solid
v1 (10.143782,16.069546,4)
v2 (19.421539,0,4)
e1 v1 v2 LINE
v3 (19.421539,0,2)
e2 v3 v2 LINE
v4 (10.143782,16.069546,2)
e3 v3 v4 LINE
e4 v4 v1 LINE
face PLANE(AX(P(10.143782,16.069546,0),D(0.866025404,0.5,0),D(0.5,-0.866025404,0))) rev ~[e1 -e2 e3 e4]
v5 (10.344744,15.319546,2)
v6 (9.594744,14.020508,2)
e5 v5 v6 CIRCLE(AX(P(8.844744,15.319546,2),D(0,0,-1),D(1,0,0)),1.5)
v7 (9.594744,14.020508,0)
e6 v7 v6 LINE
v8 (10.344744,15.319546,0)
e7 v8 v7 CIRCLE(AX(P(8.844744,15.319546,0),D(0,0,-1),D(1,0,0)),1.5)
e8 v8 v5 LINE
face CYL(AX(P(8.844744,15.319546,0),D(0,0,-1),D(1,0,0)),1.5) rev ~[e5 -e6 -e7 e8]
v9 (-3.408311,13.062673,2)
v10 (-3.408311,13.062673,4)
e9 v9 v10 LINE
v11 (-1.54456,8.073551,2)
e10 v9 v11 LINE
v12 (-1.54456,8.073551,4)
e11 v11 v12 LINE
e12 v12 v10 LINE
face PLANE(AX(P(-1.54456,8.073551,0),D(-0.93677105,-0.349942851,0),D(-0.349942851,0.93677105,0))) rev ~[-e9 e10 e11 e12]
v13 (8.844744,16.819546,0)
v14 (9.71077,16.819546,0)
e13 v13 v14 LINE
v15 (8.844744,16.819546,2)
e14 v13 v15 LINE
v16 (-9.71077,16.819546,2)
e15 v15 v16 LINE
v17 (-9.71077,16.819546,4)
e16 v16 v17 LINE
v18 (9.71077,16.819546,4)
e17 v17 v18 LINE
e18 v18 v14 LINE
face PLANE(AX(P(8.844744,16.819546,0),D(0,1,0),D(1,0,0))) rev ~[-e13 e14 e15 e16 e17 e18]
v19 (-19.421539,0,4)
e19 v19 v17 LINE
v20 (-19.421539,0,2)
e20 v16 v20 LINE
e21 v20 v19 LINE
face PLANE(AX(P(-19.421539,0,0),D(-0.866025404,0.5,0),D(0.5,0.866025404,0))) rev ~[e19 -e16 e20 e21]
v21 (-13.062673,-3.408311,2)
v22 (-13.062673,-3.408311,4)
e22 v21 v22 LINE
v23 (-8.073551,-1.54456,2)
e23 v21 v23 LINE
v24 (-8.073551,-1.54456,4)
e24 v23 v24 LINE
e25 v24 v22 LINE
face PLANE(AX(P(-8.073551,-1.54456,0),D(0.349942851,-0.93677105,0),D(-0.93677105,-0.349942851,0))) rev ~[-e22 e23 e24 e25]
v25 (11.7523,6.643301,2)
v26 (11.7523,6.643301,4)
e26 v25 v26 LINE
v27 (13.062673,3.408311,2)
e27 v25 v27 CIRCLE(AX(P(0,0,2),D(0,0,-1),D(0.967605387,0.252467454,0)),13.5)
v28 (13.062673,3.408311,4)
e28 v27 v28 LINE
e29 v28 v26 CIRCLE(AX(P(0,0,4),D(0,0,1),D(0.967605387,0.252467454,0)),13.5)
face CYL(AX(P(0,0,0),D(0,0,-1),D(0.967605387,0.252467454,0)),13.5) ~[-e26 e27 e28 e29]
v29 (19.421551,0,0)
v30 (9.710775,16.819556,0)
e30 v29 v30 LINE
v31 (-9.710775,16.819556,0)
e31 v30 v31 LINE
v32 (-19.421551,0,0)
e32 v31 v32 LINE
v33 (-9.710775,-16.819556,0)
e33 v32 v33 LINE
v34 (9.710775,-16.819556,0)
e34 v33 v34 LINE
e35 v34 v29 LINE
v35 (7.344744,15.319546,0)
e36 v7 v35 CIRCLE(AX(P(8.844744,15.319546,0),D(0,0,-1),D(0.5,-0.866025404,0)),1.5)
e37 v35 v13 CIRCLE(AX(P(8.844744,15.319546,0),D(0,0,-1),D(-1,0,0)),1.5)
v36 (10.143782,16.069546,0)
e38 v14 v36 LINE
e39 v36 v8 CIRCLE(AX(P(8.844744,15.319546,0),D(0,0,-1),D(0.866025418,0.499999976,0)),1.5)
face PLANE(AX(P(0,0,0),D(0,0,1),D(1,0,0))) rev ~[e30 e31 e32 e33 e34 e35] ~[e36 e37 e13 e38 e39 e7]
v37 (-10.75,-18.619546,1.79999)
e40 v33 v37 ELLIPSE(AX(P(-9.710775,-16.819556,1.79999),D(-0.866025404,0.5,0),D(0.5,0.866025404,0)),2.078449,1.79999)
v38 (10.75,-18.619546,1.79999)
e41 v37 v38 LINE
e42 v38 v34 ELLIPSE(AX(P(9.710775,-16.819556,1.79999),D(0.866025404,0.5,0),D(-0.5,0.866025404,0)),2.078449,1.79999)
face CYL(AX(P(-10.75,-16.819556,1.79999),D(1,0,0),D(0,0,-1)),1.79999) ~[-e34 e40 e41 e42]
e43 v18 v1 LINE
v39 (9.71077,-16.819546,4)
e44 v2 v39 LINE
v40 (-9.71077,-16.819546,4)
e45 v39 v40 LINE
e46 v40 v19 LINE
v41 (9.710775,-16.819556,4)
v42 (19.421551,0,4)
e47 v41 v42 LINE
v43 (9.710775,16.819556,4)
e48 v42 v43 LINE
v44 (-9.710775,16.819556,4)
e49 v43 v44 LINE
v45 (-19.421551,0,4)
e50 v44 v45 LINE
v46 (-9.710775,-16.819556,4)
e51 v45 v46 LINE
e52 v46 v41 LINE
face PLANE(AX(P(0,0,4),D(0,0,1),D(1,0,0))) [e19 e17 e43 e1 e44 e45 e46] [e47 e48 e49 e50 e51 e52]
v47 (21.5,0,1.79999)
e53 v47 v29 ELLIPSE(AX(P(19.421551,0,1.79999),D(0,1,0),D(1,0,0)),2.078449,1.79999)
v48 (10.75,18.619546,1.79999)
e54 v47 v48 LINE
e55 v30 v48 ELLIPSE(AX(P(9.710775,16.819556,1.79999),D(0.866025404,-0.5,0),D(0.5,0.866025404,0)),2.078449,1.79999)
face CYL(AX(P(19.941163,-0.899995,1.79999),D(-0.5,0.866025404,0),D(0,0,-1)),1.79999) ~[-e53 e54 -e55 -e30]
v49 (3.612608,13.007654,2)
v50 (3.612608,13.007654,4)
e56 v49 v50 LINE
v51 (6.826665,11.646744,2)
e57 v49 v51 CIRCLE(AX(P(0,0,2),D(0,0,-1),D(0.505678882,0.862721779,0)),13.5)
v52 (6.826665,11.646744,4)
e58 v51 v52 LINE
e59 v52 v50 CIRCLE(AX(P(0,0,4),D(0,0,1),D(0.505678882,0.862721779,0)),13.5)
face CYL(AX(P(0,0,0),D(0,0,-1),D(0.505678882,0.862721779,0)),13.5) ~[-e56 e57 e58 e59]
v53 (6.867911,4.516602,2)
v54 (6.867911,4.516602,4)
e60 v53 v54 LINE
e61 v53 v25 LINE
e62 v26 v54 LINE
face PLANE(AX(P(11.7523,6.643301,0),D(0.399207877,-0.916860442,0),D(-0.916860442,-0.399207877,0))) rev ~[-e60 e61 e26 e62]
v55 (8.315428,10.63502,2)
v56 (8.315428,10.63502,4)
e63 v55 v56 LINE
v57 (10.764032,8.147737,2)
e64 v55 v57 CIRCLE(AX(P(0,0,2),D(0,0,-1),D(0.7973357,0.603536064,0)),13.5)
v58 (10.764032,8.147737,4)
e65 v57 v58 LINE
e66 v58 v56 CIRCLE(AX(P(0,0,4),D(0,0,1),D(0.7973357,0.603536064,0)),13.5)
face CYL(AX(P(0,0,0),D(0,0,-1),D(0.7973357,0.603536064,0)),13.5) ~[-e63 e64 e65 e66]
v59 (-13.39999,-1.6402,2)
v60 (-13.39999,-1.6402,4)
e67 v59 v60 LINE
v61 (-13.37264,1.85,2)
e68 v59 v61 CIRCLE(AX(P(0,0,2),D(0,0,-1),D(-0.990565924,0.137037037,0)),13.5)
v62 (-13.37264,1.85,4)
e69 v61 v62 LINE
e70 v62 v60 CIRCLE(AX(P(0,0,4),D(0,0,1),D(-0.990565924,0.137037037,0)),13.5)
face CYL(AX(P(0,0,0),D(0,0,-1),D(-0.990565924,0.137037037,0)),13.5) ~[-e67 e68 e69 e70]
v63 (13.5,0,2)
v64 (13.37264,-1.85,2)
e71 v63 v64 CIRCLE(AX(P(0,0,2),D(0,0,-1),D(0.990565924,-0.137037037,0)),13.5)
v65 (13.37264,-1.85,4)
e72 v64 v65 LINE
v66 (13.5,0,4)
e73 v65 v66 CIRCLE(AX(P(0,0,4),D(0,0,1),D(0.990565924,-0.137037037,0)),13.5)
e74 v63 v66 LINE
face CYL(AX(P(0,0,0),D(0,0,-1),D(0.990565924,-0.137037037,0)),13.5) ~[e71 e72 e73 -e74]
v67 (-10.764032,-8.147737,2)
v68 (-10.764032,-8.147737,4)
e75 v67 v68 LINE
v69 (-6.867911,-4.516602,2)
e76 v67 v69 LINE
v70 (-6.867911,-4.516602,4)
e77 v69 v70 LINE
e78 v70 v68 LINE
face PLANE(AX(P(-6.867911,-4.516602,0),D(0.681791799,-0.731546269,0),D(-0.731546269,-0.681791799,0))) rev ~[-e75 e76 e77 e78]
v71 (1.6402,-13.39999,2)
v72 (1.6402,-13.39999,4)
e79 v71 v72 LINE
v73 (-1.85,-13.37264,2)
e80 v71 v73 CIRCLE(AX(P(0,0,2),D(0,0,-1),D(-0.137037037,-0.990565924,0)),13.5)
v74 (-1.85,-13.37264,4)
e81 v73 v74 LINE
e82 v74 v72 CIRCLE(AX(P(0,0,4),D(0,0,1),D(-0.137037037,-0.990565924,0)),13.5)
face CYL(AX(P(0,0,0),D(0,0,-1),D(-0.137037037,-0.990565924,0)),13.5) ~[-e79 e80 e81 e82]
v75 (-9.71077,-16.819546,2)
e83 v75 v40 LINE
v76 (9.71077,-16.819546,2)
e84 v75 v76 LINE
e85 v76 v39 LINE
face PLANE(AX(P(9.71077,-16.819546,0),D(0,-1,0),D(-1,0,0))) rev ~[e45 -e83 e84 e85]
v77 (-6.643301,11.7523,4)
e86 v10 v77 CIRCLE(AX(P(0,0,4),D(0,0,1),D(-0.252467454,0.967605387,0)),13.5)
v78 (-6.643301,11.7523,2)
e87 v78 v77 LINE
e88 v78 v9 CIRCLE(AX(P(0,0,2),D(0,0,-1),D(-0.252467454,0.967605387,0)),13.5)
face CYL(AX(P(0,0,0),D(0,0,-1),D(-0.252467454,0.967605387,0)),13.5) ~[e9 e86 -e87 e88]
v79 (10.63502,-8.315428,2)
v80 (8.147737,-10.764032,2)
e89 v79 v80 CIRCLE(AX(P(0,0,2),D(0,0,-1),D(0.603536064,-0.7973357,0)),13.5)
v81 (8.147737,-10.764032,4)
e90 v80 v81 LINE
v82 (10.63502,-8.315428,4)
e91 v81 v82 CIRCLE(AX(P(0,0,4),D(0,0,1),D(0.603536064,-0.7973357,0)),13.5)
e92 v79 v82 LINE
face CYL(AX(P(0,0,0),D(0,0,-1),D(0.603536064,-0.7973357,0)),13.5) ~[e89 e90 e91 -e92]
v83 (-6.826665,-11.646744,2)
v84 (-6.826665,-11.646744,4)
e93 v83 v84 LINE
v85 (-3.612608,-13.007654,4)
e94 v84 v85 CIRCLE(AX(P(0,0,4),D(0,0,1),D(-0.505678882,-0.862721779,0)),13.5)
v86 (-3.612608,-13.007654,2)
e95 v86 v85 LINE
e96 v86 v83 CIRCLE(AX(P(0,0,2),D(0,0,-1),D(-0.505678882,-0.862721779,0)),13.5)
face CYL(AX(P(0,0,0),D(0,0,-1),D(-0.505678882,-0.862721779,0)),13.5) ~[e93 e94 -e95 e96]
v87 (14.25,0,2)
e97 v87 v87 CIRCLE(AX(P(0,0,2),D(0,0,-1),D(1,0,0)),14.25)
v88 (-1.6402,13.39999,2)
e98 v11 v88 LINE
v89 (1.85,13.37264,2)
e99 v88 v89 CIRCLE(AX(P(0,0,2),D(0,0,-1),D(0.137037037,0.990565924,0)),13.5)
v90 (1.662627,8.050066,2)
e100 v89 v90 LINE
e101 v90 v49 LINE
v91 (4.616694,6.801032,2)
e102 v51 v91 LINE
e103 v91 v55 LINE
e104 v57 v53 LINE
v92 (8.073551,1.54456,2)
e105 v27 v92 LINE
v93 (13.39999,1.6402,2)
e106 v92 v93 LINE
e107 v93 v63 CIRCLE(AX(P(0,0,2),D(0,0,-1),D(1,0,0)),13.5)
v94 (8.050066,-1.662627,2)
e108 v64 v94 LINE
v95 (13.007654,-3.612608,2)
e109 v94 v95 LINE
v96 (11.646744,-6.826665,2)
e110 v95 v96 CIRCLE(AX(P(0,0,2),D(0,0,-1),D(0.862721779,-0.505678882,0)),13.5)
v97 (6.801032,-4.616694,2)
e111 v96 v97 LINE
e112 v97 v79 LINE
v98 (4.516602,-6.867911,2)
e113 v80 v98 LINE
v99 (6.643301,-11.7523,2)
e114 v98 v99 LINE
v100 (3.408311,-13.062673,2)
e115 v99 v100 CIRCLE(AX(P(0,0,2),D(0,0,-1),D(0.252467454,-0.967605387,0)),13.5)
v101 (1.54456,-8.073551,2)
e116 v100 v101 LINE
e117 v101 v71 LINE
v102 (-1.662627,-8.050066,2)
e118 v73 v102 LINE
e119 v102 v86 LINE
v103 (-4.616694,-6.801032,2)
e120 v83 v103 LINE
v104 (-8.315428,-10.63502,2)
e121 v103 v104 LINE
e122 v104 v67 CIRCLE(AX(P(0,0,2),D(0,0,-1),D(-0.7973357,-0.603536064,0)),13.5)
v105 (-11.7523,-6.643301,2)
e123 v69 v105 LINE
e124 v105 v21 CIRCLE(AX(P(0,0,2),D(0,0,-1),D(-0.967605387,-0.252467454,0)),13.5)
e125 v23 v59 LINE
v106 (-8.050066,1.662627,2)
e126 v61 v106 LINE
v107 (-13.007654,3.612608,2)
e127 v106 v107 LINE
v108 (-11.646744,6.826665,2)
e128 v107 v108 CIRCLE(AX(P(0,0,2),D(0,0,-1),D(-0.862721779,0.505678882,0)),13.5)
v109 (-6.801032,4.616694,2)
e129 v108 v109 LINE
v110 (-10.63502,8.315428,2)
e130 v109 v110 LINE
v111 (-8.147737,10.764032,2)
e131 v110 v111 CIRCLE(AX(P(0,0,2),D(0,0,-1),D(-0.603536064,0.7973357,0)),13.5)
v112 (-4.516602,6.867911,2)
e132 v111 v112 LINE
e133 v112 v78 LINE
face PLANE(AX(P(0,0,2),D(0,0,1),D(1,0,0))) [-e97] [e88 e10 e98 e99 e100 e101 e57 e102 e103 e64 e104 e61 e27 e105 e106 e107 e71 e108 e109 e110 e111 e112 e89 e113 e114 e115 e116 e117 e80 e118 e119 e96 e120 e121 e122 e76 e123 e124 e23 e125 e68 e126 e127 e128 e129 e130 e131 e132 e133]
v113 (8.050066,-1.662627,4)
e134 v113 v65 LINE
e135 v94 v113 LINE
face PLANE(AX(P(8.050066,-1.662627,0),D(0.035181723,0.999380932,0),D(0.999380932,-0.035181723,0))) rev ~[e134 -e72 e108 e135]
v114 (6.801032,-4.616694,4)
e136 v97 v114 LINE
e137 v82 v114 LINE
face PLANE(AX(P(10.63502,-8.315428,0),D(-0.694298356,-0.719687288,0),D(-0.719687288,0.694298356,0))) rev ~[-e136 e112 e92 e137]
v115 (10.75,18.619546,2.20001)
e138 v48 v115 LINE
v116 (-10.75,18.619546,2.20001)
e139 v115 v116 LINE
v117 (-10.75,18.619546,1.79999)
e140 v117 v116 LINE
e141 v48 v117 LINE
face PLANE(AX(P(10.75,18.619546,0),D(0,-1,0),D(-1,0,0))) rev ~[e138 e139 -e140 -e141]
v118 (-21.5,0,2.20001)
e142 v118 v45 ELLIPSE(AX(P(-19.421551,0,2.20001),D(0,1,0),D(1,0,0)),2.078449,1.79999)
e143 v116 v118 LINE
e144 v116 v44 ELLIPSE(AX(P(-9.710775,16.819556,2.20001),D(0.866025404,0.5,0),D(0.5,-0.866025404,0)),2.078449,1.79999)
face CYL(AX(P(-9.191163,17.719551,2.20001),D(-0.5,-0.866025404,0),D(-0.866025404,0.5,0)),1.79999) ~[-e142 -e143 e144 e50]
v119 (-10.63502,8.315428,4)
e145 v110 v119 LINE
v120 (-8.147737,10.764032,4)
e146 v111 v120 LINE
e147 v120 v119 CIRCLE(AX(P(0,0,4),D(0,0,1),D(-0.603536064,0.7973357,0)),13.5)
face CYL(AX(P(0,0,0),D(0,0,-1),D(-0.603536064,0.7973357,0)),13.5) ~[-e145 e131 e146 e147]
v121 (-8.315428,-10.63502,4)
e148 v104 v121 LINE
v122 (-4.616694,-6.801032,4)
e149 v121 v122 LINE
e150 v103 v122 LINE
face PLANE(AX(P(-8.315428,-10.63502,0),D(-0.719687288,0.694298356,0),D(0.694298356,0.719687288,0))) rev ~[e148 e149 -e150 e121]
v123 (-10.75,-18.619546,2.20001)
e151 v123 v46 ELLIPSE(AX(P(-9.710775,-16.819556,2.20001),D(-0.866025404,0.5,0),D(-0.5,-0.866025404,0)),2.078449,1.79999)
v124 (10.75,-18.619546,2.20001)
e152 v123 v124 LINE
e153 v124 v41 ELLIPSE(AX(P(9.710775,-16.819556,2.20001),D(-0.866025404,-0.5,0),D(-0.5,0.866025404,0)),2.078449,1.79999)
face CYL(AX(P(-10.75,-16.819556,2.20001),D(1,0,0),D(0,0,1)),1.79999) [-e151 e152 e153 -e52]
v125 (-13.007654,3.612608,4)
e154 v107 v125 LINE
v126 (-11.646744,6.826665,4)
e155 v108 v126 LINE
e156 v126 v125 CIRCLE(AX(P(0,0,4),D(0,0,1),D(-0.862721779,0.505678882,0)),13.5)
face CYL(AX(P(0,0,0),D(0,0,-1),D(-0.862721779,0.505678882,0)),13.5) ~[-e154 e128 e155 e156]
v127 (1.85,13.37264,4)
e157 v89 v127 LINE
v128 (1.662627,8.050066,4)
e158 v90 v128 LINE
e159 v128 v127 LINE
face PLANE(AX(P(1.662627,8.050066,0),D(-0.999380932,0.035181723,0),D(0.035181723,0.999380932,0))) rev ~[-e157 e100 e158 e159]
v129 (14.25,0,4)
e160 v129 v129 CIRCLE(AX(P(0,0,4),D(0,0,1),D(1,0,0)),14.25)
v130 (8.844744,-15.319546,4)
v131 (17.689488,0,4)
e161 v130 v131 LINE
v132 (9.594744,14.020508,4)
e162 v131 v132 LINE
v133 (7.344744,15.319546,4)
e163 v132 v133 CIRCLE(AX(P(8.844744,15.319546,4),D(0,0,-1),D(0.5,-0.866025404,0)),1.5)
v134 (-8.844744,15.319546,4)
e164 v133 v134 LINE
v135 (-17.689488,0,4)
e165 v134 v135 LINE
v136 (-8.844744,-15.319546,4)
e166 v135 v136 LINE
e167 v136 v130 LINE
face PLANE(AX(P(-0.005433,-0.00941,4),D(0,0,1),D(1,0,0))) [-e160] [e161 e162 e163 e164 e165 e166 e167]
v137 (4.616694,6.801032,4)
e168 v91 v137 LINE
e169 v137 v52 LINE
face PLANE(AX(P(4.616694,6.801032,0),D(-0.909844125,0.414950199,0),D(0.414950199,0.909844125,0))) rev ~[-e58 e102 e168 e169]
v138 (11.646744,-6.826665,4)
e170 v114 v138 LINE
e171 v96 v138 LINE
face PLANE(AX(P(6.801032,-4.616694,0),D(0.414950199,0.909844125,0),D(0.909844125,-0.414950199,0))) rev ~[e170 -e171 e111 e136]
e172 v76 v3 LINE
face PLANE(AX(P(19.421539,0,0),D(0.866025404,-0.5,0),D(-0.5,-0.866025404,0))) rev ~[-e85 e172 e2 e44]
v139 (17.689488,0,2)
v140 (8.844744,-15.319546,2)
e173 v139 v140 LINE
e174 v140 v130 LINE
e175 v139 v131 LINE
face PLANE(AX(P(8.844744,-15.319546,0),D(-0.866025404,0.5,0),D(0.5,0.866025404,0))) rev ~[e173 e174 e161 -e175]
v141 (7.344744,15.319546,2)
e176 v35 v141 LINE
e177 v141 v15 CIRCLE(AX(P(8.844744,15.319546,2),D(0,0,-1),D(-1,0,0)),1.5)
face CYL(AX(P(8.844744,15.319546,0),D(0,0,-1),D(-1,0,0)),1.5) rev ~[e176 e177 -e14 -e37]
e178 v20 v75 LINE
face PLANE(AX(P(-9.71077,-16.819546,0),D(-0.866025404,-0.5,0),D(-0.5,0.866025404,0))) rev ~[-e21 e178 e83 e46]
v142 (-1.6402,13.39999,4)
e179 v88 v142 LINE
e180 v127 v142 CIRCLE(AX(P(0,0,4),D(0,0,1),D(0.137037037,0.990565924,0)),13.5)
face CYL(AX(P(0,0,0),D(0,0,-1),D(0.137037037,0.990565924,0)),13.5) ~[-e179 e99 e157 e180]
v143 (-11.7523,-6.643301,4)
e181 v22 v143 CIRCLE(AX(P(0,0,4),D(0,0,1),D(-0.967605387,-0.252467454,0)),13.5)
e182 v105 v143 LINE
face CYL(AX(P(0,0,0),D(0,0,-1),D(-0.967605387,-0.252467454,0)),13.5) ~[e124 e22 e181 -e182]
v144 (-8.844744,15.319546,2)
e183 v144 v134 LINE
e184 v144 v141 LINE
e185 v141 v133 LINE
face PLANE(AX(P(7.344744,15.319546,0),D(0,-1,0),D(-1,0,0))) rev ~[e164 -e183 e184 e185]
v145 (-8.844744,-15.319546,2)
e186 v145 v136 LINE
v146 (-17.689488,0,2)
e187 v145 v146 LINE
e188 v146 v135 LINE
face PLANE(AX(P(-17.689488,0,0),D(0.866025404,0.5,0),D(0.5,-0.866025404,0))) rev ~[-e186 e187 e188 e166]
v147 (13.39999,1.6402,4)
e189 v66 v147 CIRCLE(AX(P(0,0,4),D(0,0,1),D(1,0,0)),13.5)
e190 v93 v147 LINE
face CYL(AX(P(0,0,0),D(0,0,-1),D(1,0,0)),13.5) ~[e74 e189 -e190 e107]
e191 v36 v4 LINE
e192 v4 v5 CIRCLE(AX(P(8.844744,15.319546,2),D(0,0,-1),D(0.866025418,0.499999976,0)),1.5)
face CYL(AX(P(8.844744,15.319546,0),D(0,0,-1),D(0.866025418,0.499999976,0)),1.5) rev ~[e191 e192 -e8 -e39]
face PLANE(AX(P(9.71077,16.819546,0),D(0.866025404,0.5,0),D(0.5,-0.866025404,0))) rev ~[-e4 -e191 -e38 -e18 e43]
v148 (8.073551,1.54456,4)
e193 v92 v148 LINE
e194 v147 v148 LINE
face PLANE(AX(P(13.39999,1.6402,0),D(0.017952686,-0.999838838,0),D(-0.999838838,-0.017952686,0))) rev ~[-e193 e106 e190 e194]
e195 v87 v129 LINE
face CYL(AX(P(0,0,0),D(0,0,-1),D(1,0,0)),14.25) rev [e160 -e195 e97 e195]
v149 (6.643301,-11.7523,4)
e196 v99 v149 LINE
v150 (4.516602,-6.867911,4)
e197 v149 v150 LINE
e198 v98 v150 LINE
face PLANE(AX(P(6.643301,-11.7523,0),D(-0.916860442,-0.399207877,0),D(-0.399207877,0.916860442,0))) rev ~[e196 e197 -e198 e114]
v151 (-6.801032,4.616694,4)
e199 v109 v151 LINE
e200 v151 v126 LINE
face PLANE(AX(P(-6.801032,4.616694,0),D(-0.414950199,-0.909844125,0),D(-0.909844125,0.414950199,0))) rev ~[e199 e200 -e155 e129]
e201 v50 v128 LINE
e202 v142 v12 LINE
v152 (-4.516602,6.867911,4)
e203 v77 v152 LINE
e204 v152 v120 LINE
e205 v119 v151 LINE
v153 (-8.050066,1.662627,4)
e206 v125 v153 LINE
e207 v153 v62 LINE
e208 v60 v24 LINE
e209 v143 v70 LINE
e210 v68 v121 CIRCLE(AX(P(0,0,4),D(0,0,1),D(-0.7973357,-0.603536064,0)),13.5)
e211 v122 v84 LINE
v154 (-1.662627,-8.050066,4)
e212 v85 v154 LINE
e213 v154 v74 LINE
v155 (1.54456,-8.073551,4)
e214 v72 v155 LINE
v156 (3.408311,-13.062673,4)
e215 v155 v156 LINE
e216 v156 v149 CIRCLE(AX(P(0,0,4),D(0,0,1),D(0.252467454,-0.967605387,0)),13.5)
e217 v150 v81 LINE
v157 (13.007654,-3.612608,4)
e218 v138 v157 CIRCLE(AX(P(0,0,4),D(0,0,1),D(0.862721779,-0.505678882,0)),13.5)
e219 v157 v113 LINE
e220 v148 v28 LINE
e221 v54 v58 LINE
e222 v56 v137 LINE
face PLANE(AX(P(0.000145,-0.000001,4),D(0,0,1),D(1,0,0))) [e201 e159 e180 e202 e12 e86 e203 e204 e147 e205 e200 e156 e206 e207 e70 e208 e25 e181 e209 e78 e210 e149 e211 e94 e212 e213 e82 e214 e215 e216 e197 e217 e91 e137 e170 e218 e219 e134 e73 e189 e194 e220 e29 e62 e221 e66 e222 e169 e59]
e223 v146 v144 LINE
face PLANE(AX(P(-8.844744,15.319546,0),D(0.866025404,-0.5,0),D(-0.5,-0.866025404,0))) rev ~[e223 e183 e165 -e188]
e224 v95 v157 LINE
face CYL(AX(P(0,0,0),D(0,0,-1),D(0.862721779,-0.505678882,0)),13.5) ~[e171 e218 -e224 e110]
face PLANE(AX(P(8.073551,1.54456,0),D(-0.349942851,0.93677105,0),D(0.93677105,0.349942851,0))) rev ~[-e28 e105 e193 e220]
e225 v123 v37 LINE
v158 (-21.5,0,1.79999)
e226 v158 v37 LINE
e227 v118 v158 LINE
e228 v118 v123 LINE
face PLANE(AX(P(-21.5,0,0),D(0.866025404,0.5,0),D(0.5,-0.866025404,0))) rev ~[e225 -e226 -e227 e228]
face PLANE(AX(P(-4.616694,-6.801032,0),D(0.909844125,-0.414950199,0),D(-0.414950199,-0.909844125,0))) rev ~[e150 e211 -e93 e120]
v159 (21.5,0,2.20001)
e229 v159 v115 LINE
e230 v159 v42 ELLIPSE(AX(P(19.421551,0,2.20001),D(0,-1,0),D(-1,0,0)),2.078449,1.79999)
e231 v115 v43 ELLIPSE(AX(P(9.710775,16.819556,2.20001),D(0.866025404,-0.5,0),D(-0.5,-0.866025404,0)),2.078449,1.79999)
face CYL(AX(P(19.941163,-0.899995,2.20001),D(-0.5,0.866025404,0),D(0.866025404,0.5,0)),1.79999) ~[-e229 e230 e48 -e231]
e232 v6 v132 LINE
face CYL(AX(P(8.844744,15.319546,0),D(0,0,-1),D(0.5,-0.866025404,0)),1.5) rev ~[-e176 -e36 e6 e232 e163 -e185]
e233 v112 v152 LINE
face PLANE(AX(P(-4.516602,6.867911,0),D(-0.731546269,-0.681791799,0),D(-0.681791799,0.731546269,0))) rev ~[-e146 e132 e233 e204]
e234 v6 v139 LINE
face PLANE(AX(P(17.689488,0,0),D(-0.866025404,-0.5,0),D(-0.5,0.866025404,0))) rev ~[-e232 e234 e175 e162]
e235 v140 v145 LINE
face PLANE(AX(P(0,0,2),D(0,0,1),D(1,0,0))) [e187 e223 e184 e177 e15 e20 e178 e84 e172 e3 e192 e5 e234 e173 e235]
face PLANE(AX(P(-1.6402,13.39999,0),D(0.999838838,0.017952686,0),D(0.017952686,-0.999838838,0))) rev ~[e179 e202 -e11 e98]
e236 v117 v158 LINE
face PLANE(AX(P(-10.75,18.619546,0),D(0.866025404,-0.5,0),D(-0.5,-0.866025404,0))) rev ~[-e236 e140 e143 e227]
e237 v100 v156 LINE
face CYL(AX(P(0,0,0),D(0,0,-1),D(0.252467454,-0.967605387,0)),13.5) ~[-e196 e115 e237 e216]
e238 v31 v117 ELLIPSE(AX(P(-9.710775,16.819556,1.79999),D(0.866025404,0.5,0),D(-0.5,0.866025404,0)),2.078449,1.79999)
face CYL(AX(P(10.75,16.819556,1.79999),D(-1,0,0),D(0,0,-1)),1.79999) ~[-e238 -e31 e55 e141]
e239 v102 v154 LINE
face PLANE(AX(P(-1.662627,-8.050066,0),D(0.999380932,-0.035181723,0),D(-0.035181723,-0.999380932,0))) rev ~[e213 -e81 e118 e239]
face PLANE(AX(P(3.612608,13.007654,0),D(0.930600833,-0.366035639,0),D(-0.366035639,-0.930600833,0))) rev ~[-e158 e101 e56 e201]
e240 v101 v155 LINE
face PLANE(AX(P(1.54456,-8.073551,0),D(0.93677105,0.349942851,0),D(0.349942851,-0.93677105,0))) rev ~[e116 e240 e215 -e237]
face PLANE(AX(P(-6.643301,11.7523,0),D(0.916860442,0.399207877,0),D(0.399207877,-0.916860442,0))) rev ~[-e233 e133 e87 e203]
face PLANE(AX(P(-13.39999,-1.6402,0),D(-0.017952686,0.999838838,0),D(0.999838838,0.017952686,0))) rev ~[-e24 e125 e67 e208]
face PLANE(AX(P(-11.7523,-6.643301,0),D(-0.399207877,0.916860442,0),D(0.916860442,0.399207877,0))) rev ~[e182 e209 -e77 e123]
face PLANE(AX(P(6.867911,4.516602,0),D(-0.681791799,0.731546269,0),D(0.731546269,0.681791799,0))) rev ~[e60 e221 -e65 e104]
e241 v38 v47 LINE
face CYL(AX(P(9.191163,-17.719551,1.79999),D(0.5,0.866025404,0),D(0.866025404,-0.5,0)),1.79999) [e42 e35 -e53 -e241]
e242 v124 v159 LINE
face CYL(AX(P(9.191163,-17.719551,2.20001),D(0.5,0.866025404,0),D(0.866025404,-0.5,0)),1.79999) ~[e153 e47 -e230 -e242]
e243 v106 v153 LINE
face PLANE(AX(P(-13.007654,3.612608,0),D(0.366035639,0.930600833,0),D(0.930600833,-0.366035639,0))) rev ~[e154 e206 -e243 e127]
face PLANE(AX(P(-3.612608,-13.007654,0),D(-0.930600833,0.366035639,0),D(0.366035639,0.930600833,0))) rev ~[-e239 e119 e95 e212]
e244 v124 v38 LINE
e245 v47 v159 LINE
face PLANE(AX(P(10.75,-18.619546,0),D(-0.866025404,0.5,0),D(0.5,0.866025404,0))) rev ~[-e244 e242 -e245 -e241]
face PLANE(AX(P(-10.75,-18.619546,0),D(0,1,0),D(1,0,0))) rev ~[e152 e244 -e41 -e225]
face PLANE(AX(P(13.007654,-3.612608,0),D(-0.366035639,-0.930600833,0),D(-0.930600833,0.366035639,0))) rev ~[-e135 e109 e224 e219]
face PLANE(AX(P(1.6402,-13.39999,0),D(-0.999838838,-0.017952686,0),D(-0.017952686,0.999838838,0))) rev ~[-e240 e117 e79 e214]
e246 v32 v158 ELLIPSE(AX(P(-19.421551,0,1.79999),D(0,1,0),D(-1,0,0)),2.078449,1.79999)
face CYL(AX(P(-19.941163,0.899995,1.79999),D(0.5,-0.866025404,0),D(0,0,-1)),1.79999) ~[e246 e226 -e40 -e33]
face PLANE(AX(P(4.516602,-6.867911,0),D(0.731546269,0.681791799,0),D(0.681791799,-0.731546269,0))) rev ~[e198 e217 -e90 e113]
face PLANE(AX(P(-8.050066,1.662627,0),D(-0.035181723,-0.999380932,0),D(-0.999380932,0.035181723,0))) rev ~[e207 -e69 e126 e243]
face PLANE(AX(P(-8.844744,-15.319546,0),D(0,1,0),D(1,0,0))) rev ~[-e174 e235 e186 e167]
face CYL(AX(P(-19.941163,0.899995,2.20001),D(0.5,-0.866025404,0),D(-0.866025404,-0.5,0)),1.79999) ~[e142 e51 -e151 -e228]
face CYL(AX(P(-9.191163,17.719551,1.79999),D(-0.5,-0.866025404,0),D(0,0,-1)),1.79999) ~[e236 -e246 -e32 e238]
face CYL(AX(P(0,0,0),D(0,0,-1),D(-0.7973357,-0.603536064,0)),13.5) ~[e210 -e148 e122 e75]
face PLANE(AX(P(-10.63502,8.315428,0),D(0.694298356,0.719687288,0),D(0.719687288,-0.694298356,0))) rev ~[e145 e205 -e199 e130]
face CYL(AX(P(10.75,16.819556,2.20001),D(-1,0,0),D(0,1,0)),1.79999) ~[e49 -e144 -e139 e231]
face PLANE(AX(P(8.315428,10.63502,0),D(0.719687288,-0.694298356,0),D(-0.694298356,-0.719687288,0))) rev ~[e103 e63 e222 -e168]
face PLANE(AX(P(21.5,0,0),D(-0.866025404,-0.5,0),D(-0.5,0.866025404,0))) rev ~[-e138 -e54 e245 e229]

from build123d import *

# Parameters (mm, degrees)
F0_R     = 14.25
F1_DEPTH = 2
F2_DEPTH = 4
F3_R     = 1.79999


# Not quite as in the source:
# - a fillet or chamfer is up to 0.001 mm smaller than in the source, because OpenCascade refuses the exact size


with BuildPart() as f1:
    # F0 (on Top) → F1 (new body)
    with BuildSketch(Plane.XY):
        Polygon((10.75, -18.6195461814), (21.5, 0), (10.75, 18.6195461814), (-10.75, 18.6195461814), (-21.5, 0), (-10.75, -18.6195461814), align=None)
        Polygon((-19.4215390309, 0), (-9.7107695155, 16.8195461814), (8.8447441387, 16.8195461814), (9.7107695155, 16.8195461814), (10.1437822383, 16.069546145), (19.4215390309, 0), (9.7107695155, -16.8195461814), (-9.7107695155, -16.8195461814), align=None, mode=Mode.SUBTRACT)
        with BuildLine():
            ThreePointArc((9.5947441117, 14.0205080757), (8.0947441117, 14.0205080757), (7.3447441117, 15.3195461814))
            Line((7.3447441117, 15.3195461814), (-8.8447441117, 15.3195461814))
            Line((-8.8447441117, 15.3195461814), (-17.6894882233, 0))
            Line((-17.6894882233, 0), (-8.8447441117, -15.3195461814))
            Line((-8.8447441117, -15.3195461814), (8.8447441117, -15.3195461814))
            Line((8.8447441117, -15.3195461814), (17.6894882233, 0))
            Line((17.6894882233, 0), (9.5947441117, 14.0205080757))
        make_face()
        Circle(F0_R, mode=Mode.SUBTRACT)
        Circle(F0_R)
        with BuildLine():
            ThreePointArc((13.3999904986, 1.6401995725), (13.4749744291, 0.8216228664), (13.5, 0))
            ThreePointArc((13.5, 0), (13.4681223582, -0.9271893786), (13.3726399787, -1.85))
            ThreePointArc((13.3726399787, -1.85), (13.2195565752, -2.7373936427), (13.0076541597, -3.6126075434))
            ThreePointArc((13.0076541597, -3.6126075434), (12.4315074952, -5.2638029406), (11.6467440221, -6.826664902))
            ThreePointArc((11.6467440221, -6.826664902), (11.1657225538, -7.5879272435), (10.6350203896, -8.3154279091))
            ThreePointArc((10.6350203896, -8.3154279091), (9.4708451564, -9.6204517577), (8.1477368661, -10.7640319565))
            ThreePointArc((8.1477368661, -10.7640319565), (7.4120084911, -11.2832677061), (6.643301172, -11.7522997553))
            ThreePointArc((6.643301172, -11.7522997553), (5.0683324961, -12.5124740043), (3.4083106317, -13.0626727218))
            ThreePointArc((3.4083106317, -13.0626727218), (2.5298833256, -13.2608329436), (1.6401995725, -13.3999904986))
            ThreePointArc((1.6401995725, -13.3999904986), (-0.1057878423, -13.4995855097), (-1.85, -13.3726399787))
            ThreePointArc((-1.85, -13.3726399787), (-2.7373936427, -13.2195565752), (-3.6126075434, -13.0076541597))
            ThreePointArc((-3.6126075434, -13.0076541597), (-5.2638029406, -12.4315074952), (-6.826664902, -11.6467440221))
            ThreePointArc((-6.826664902, -11.6467440221), (-7.5879272435, -11.1657225538), (-8.3154279091, -10.6350203896))
            ThreePointArc((-8.3154279091, -10.6350203896), (-9.6204517577, -9.4708451564), (-10.7640319565, -8.1477368661))
            ThreePointArc((-10.7640319565, -8.1477368661), (-11.2832677061, -7.4120084911), (-11.7522997553, -6.643301172))
            ThreePointArc((-11.7522997553, -6.643301172), (-12.5124740043, -5.0683324961), (-13.0626727218, -3.4083106317))
            ThreePointArc((-13.0626727218, -3.4083106317), (-13.2608329436, -2.5298833256), (-13.3999904986, -1.6401995725))
            ThreePointArc((-13.3999904986, -1.6401995725), (-13.4995855097, 0.1057878423), (-13.3726399787, 1.85))
            ThreePointArc((-13.3726399787, 1.85), (-13.2195565752, 2.7373936427), (-13.0076541597, 3.6126075434))
            ThreePointArc((-13.0076541597, 3.6126075434), (-12.4315074952, 5.2638029406), (-11.6467440221, 6.826664902))
            ThreePointArc((-11.6467440221, 6.826664902), (-11.1657225538, 7.5879272435), (-10.6350203896, 8.3154279091))
            ThreePointArc((-10.6350203896, 8.3154279091), (-9.4708451564, 9.6204517577), (-8.1477368661, 10.7640319565))
            ThreePointArc((-8.1477368661, 10.7640319565), (-7.4120084911, 11.2832677061), (-6.643301172, 11.7522997553))
            ThreePointArc((-6.643301172, 11.7522997553), (-5.0683324961, 12.5124740043), (-3.4083106317, 13.0626727218))
            ThreePointArc((-3.4083106317, 13.0626727218), (-2.5298833256, 13.2608329436), (-1.6401995725, 13.3999904986))
            ThreePointArc((-1.6401995725, 13.3999904986), (0.1057878423, 13.4995855097), (1.85, 13.3726399787))
            ThreePointArc((1.85, 13.3726399787), (2.7373936427, 13.2195565752), (3.6126075434, 13.0076541597))
            ThreePointArc((3.6126075434, 13.0076541597), (5.2638029406, 12.4315074952), (6.826664902, 11.6467440221))
            ThreePointArc((6.826664902, 11.6467440221), (7.5879272435, 11.1657225538), (8.3154279091, 10.6350203896))
            ThreePointArc((8.3154279091, 10.6350203896), (9.6204517577, 9.4708451564), (10.7640319565, 8.1477368661))
            ThreePointArc((10.7640319565, 8.1477368661), (11.2832677061, 7.4120084911), (11.7522997553, 6.643301172))
            ThreePointArc((11.7522997553, 6.643301172), (12.5124740043, 5.0683324961), (13.0626727218, 3.4083106317))
            ThreePointArc((13.0626727218, 3.4083106317), (13.2608329436, 2.5298833256), (13.3999904986, 1.6401995725))
        make_face(mode=Mode.SUBTRACT)
        with BuildLine():
            ThreePointArc((13.3726399787, -1.85), (13.4681223582, -0.9271893786), (13.5, 0))
            ThreePointArc((13.5, 0), (13.4749744291, 0.8216228664), (13.3999904986, 1.6401995725))
            Line((13.3999904986, 1.6401995725), (8.0735512703, 1.5445602693))
            Line((8.0735512703, 1.5445602693), (13.0626727218, 3.4083106317))
            ThreePointArc((13.0626727218, 3.4083106317), (12.5124740043, 5.0683324961), (11.7522997553, 6.643301172))
            Line((11.7522997553, 6.643301172), (6.867911148, 4.5166019311))
            Line((6.867911148, 4.5166019311), (10.7640319565, 8.1477368661))
            ThreePointArc((10.7640319565, 8.1477368661), (9.6204517577, 9.4708451564), (8.3154279091, 10.6350203896))
            Line((8.3154279091, 10.6350203896), (4.6166938111, 6.8010318919))
            Line((4.6166938111, 6.8010318919), (6.826664902, 11.6467440221))
            ThreePointArc((6.826664902, 11.6467440221), (5.2638029406, 12.4315074952), (3.6126075434, 13.0076541597))
            Line((3.6126075434, 13.0076541597), (1.6626266919, 8.0500663987))
            Line((1.6626266919, 8.0500663987), (1.85, 13.3726399787))
            ThreePointArc((1.85, 13.3726399787), (0.1057878423, 13.4995855097), (-1.6401995725, 13.3999904986))
            Line((-1.6401995725, 13.3999904986), (-1.5445602693, 8.0735512703))
            Line((-1.5445602693, 8.0735512703), (-3.4083106317, 13.0626727218))
            ThreePointArc((-3.4083106317, 13.0626727218), (-5.0683324961, 12.5124740043), (-6.643301172, 11.7522997553))
            Line((-6.643301172, 11.7522997553), (-4.5166019311, 6.867911148))
            Line((-4.5166019311, 6.867911148), (-8.1477368661, 10.7640319565))
            ThreePointArc((-8.1477368661, 10.7640319565), (-9.4708451564, 9.6204517577), (-10.6350203896, 8.3154279091))
            Line((-10.6350203896, 8.3154279091), (-6.8010318919, 4.6166938111))
            Line((-6.8010318919, 4.6166938111), (-11.6467440221, 6.826664902))
            ThreePointArc((-11.6467440221, 6.826664902), (-12.4315074952, 5.2638029406), (-13.0076541597, 3.6126075434))
            Line((-13.0076541597, 3.6126075434), (-8.0500663987, 1.6626266919))
            Line((-8.0500663987, 1.6626266919), (-13.3726399787, 1.85))
            ThreePointArc((-13.3726399787, 1.85), (-13.4995855097, 0.1057878423), (-13.3999904986, -1.6401995725))
            Line((-13.3999904986, -1.6401995725), (-8.0735512703, -1.5445602693))
            Line((-8.0735512703, -1.5445602693), (-13.0626727218, -3.4083106317))
            ThreePointArc((-13.0626727218, -3.4083106317), (-12.5124740043, -5.0683324961), (-11.7522997553, -6.643301172))
            Line((-11.7522997553, -6.643301172), (-6.867911148, -4.5166019311))
            Line((-6.867911148, -4.5166019311), (-10.7640319565, -8.1477368661))
            ThreePointArc((-10.7640319565, -8.1477368661), (-9.6204517577, -9.4708451564), (-8.3154279091, -10.6350203896))
            Line((-8.3154279091, -10.6350203896), (-4.6166938111, -6.8010318919))
            Line((-4.6166938111, -6.8010318919), (-6.826664902, -11.6467440221))
            ThreePointArc((-6.826664902, -11.6467440221), (-5.2638029406, -12.4315074952), (-3.6126075434, -13.0076541597))
            Line((-3.6126075434, -13.0076541597), (-1.6626266919, -8.0500663987))
            Line((-1.6626266919, -8.0500663987), (-1.85, -13.3726399787))
            ThreePointArc((-1.85, -13.3726399787), (-0.1057878423, -13.4995855097), (1.6401995725, -13.3999904986))
            Line((1.6401995725, -13.3999904986), (1.5445602693, -8.0735512703))
            Line((1.5445602693, -8.0735512703), (3.4083106317, -13.0626727218))
            ThreePointArc((3.4083106317, -13.0626727218), (5.0683324961, -12.5124740043), (6.643301172, -11.7522997553))
            Line((6.643301172, -11.7522997553), (4.5166019311, -6.867911148))
            Line((4.5166019311, -6.867911148), (8.1477368661, -10.7640319565))
            ThreePointArc((8.1477368661, -10.7640319565), (9.4708451564, -9.6204517577), (10.6350203896, -8.3154279091))
            Line((10.6350203896, -8.3154279091), (6.8010318919, -4.6166938111))
            Line((6.8010318919, -4.6166938111), (11.6467440221, -6.826664902))
            ThreePointArc((11.6467440221, -6.826664902), (12.4315074952, -5.2638029406), (13.0076541597, -3.6126075434))
            Line((13.0076541597, -3.6126075434), (8.0500663987, -1.6626266919))
            Line((8.0500663987, -1.6626266919), (13.3726399787, -1.85))
        make_face()
        with BuildLine():
            Line((8.8447441387, 16.8195461814), (-9.7107695155, 16.8195461814))
            Line((-9.7107695155, 16.8195461814), (-19.4215390309, 0))
            Line((-19.4215390309, 0), (-9.7107695155, -16.8195461814))
            Line((-9.7107695155, -16.8195461814), (9.7107695155, -16.8195461814))
            Line((9.7107695155, -16.8195461814), (19.4215390309, 0))
            Line((19.4215390309, 0), (10.1437822383, 16.069546145))
            ThreePointArc((10.1437822383, 16.069546145), (10.2936328565, 15.7077747288), (10.3447441117, 15.3195461814))
            ThreePointArc((10.3447441117, 15.3195461814), (10.1437822174, 14.5695461814), (9.5947441117, 14.0205080757))
            Line((9.5947441117, 14.0205080757), (17.6894882233, 0))
            Line((17.6894882233, 0), (8.8447441117, -15.3195461814))
            Line((8.8447441117, -15.3195461814), (-8.8447441117, -15.3195461814))
            Line((-8.8447441117, -15.3195461814), (-17.6894882233, 0))
            Line((-17.6894882233, 0), (-8.8447441117, 15.3195461814))
            Line((-8.8447441117, 15.3195461814), (7.3447441117, 15.3195461814))
            ThreePointArc((7.3447441117, 15.3195461814), (7.7840839495, 16.3802063627), (8.8447441387, 16.8195461814))
        make_face()
        with BuildLine():
            ThreePointArc((-11.7522997553, -6.643301172), (-11.2832677061, -7.4120084911), (-10.7640319565, -8.1477368661))
            Line((-10.7640319565, -8.1477368661), (-6.867911148, -4.5166019311))
            Line((-6.867911148, -4.5166019311), (-11.7522997553, -6.643301172))
        make_face()
        with BuildLine():
            ThreePointArc((-8.3154279091, -10.6350203896), (-7.5879272435, -11.1657225538), (-6.826664902, -11.6467440221))
            Line((-6.826664902, -11.6467440221), (-4.6166938111, -6.8010318919))
            Line((-4.6166938111, -6.8010318919), (-8.3154279091, -10.6350203896))
        make_face()
        with BuildLine():
            ThreePointArc((-3.6126075434, -13.0076541597), (-2.7373936427, -13.2195565752), (-1.85, -13.3726399787))
            Line((-1.85, -13.3726399787), (-1.6626266919, -8.0500663987))
            Line((-1.6626266919, -8.0500663987), (-3.6126075434, -13.0076541597))
        make_face()
        with BuildLine():
            ThreePointArc((1.6401995725, -13.3999904986), (2.5298833256, -13.2608329436), (3.4083106317, -13.0626727218))
            Line((3.4083106317, -13.0626727218), (1.5445602693, -8.0735512703))
            Line((1.5445602693, -8.0735512703), (1.6401995725, -13.3999904986))
        make_face()
        with BuildLine():
            ThreePointArc((6.643301172, -11.7522997553), (7.4120084911, -11.2832677061), (8.1477368661, -10.7640319565))
            Line((8.1477368661, -10.7640319565), (4.5166019311, -6.867911148))
            Line((4.5166019311, -6.867911148), (6.643301172, -11.7522997553))
        make_face()
        with BuildLine():
            ThreePointArc((10.6350203896, -8.3154279091), (11.1657225538, -7.5879272435), (11.6467440221, -6.826664902))
            Line((11.6467440221, -6.826664902), (6.8010318919, -4.6166938111))
            Line((6.8010318919, -4.6166938111), (10.6350203896, -8.3154279091))
        make_face()
        with BuildLine():
            ThreePointArc((13.0076541597, -3.6126075434), (13.2195565752, -2.7373936427), (13.3726399787, -1.85))
            Line((13.3726399787, -1.85), (8.0500663987, -1.6626266919))
            Line((8.0500663987, -1.6626266919), (13.0076541597, -3.6126075434))
        make_face()
        with BuildLine():
            Line((8.0735512703, 1.5445602693), (13.3999904986, 1.6401995725))
            ThreePointArc((13.3999904986, 1.6401995725), (13.2608329436, 2.5298833256), (13.0626727218, 3.4083106317))
            Line((13.0626727218, 3.4083106317), (8.0735512703, 1.5445602693))
        make_face()
        with BuildLine():
            Line((6.867911148, 4.5166019311), (11.7522997553, 6.643301172))
            ThreePointArc((11.7522997553, 6.643301172), (11.2832677061, 7.4120084911), (10.7640319565, 8.1477368661))
            Line((10.7640319565, 8.1477368661), (6.867911148, 4.5166019311))
        make_face()
        with BuildLine():
            Line((4.6166938111, 6.8010318919), (8.3154279091, 10.6350203896))
            ThreePointArc((8.3154279091, 10.6350203896), (7.5879272435, 11.1657225538), (6.826664902, 11.6467440221))
            Line((6.826664902, 11.6467440221), (4.6166938111, 6.8010318919))
        make_face()
        with BuildLine():
            Line((1.6626266919, 8.0500663987), (3.6126075434, 13.0076541597))
            ThreePointArc((3.6126075434, 13.0076541597), (2.7373936427, 13.2195565752), (1.85, 13.3726399787))
            Line((1.85, 13.3726399787), (1.6626266919, 8.0500663987))
        make_face()
        with BuildLine():
            Line((-1.5445602693, 8.0735512703), (-1.6401995725, 13.3999904986))
            ThreePointArc((-1.6401995725, 13.3999904986), (-2.5298833256, 13.2608329436), (-3.4083106317, 13.0626727218))
            Line((-3.4083106317, 13.0626727218), (-1.5445602693, 8.0735512703))
        make_face()
        with BuildLine():
            Line((-4.5166019311, 6.867911148), (-6.643301172, 11.7522997553))
            ThreePointArc((-6.643301172, 11.7522997553), (-7.4120084911, 11.2832677061), (-8.1477368661, 10.7640319565))
            Line((-8.1477368661, 10.7640319565), (-4.5166019311, 6.867911148))
        make_face()
        with BuildLine():
            Line((-6.8010318919, 4.6166938111), (-10.6350203896, 8.3154279091))
            ThreePointArc((-10.6350203896, 8.3154279091), (-11.1657225538, 7.5879272435), (-11.6467440221, 6.826664902))
            Line((-11.6467440221, 6.826664902), (-6.8010318919, 4.6166938111))
        make_face()
        with BuildLine():
            Line((-8.0500663987, 1.6626266919), (-13.0076541597, 3.6126075434))
            ThreePointArc((-13.0076541597, 3.6126075434), (-13.2195565752, 2.7373936427), (-13.3726399787, 1.85))
            Line((-13.3726399787, 1.85), (-8.0500663987, 1.6626266919))
        make_face()
        with BuildLine():
            ThreePointArc((-13.3999904986, -1.6401995725), (-13.2608329436, -2.5298833256), (-13.0626727218, -3.4083106317))
            Line((-13.0626727218, -3.4083106317), (-8.0735512703, -1.5445602693))
            Line((-8.0735512703, -1.5445602693), (-13.3999904986, -1.6401995725))
        make_face()
    extrude(amount=F1_DEPTH)

    # F0 (on Top) → F2 (join)
    with BuildSketch(Plane.XY):
        Polygon((10.75, -18.6195461814), (21.5, 0), (10.75, 18.6195461814), (-10.75, 18.6195461814), (-21.5, 0), (-10.75, -18.6195461814), align=None)
        Polygon((-19.4215390309, 0), (-9.7107695155, 16.8195461814), (8.8447441387, 16.8195461814), (9.7107695155, 16.8195461814), (10.1437822383, 16.069546145), (19.4215390309, 0), (9.7107695155, -16.8195461814), (-9.7107695155, -16.8195461814), align=None, mode=Mode.SUBTRACT)
        with BuildLine():
            ThreePointArc((9.5947441117, 14.0205080757), (8.0947441117, 14.0205080757), (7.3447441117, 15.3195461814))
            Line((7.3447441117, 15.3195461814), (-8.8447441117, 15.3195461814))
            Line((-8.8447441117, 15.3195461814), (-17.6894882233, 0))
            Line((-17.6894882233, 0), (-8.8447441117, -15.3195461814))
            Line((-8.8447441117, -15.3195461814), (8.8447441117, -15.3195461814))
            Line((8.8447441117, -15.3195461814), (17.6894882233, 0))
            Line((17.6894882233, 0), (9.5947441117, 14.0205080757))
        make_face()
        Circle(F0_R, mode=Mode.SUBTRACT)
        with BuildLine():
            ThreePointArc((13.3726399787, -1.85), (13.4681223582, -0.9271893786), (13.5, 0))
            ThreePointArc((13.5, 0), (13.4749744291, 0.8216228664), (13.3999904986, 1.6401995725))
            Line((13.3999904986, 1.6401995725), (8.0735512703, 1.5445602693))
            Line((8.0735512703, 1.5445602693), (13.0626727218, 3.4083106317))
            ThreePointArc((13.0626727218, 3.4083106317), (12.5124740043, 5.0683324961), (11.7522997553, 6.643301172))
            Line((11.7522997553, 6.643301172), (6.867911148, 4.5166019311))
            Line((6.867911148, 4.5166019311), (10.7640319565, 8.1477368661))
            ThreePointArc((10.7640319565, 8.1477368661), (9.6204517577, 9.4708451564), (8.3154279091, 10.6350203896))
            Line((8.3154279091, 10.6350203896), (4.6166938111, 6.8010318919))
            Line((4.6166938111, 6.8010318919), (6.826664902, 11.6467440221))
            ThreePointArc((6.826664902, 11.6467440221), (5.2638029406, 12.4315074952), (3.6126075434, 13.0076541597))
            Line((3.6126075434, 13.0076541597), (1.6626266919, 8.0500663987))
            Line((1.6626266919, 8.0500663987), (1.85, 13.3726399787))
            ThreePointArc((1.85, 13.3726399787), (0.1057878423, 13.4995855097), (-1.6401995725, 13.3999904986))
            Line((-1.6401995725, 13.3999904986), (-1.5445602693, 8.0735512703))
            Line((-1.5445602693, 8.0735512703), (-3.4083106317, 13.0626727218))
            ThreePointArc((-3.4083106317, 13.0626727218), (-5.0683324961, 12.5124740043), (-6.643301172, 11.7522997553))
            Line((-6.643301172, 11.7522997553), (-4.5166019311, 6.867911148))
            Line((-4.5166019311, 6.867911148), (-8.1477368661, 10.7640319565))
            ThreePointArc((-8.1477368661, 10.7640319565), (-9.4708451564, 9.6204517577), (-10.6350203896, 8.3154279091))
            Line((-10.6350203896, 8.3154279091), (-6.8010318919, 4.6166938111))
            Line((-6.8010318919, 4.6166938111), (-11.6467440221, 6.826664902))
            ThreePointArc((-11.6467440221, 6.826664902), (-12.4315074952, 5.2638029406), (-13.0076541597, 3.6126075434))
            Line((-13.0076541597, 3.6126075434), (-8.0500663987, 1.6626266919))
            Line((-8.0500663987, 1.6626266919), (-13.3726399787, 1.85))
            ThreePointArc((-13.3726399787, 1.85), (-13.4995855097, 0.1057878423), (-13.3999904986, -1.6401995725))
            Line((-13.3999904986, -1.6401995725), (-8.0735512703, -1.5445602693))
            Line((-8.0735512703, -1.5445602693), (-13.0626727218, -3.4083106317))
            ThreePointArc((-13.0626727218, -3.4083106317), (-12.5124740043, -5.0683324961), (-11.7522997553, -6.643301172))
            Line((-11.7522997553, -6.643301172), (-6.867911148, -4.5166019311))
            Line((-6.867911148, -4.5166019311), (-10.7640319565, -8.1477368661))
            ThreePointArc((-10.7640319565, -8.1477368661), (-9.6204517577, -9.4708451564), (-8.3154279091, -10.6350203896))
            Line((-8.3154279091, -10.6350203896), (-4.6166938111, -6.8010318919))
            Line((-4.6166938111, -6.8010318919), (-6.826664902, -11.6467440221))
            ThreePointArc((-6.826664902, -11.6467440221), (-5.2638029406, -12.4315074952), (-3.6126075434, -13.0076541597))
            Line((-3.6126075434, -13.0076541597), (-1.6626266919, -8.0500663987))
            Line((-1.6626266919, -8.0500663987), (-1.85, -13.3726399787))
            ThreePointArc((-1.85, -13.3726399787), (-0.1057878423, -13.4995855097), (1.6401995725, -13.3999904986))
            Line((1.6401995725, -13.3999904986), (1.5445602693, -8.0735512703))
            Line((1.5445602693, -8.0735512703), (3.4083106317, -13.0626727218))
            ThreePointArc((3.4083106317, -13.0626727218), (5.0683324961, -12.5124740043), (6.643301172, -11.7522997553))
            Line((6.643301172, -11.7522997553), (4.5166019311, -6.867911148))
            Line((4.5166019311, -6.867911148), (8.1477368661, -10.7640319565))
            ThreePointArc((8.1477368661, -10.7640319565), (9.4708451564, -9.6204517577), (10.6350203896, -8.3154279091))
            Line((10.6350203896, -8.3154279091), (6.8010318919, -4.6166938111))
            Line((6.8010318919, -4.6166938111), (11.6467440221, -6.826664902))
            ThreePointArc((11.6467440221, -6.826664902), (12.4315074952, -5.2638029406), (13.0076541597, -3.6126075434))
            Line((13.0076541597, -3.6126075434), (8.0500663987, -1.6626266919))
            Line((8.0500663987, -1.6626266919), (13.3726399787, -1.85))
        make_face()
    extrude(amount=F2_DEPTH)

    # F3 (radius 1.8 in the source; OpenCascade refuses exactly that, so slightly less here)
    f3_edges = [f1.edges().sort_by_distance(p)[0] for p in [
        (-16.125, -9.309773, 4),
        (-16.125, 9.309773, 4),
        (0, 18.619546, 4),
        (16.125, 9.309773, 4),
        (16.125, -9.309773, 4),
        (0, -18.619546, 4),
        (16.125, -9.309773, 0),
        (0, -18.619546, 0),
        (16.125, 9.309773, 0),
        (0, 18.619546, 0),
        (-16.125, 9.309773, 0),
        (-16.125, -9.309773, 0),
    ]]
    fillet(f3_edges, radius=F3_R)


solid = f1.part
